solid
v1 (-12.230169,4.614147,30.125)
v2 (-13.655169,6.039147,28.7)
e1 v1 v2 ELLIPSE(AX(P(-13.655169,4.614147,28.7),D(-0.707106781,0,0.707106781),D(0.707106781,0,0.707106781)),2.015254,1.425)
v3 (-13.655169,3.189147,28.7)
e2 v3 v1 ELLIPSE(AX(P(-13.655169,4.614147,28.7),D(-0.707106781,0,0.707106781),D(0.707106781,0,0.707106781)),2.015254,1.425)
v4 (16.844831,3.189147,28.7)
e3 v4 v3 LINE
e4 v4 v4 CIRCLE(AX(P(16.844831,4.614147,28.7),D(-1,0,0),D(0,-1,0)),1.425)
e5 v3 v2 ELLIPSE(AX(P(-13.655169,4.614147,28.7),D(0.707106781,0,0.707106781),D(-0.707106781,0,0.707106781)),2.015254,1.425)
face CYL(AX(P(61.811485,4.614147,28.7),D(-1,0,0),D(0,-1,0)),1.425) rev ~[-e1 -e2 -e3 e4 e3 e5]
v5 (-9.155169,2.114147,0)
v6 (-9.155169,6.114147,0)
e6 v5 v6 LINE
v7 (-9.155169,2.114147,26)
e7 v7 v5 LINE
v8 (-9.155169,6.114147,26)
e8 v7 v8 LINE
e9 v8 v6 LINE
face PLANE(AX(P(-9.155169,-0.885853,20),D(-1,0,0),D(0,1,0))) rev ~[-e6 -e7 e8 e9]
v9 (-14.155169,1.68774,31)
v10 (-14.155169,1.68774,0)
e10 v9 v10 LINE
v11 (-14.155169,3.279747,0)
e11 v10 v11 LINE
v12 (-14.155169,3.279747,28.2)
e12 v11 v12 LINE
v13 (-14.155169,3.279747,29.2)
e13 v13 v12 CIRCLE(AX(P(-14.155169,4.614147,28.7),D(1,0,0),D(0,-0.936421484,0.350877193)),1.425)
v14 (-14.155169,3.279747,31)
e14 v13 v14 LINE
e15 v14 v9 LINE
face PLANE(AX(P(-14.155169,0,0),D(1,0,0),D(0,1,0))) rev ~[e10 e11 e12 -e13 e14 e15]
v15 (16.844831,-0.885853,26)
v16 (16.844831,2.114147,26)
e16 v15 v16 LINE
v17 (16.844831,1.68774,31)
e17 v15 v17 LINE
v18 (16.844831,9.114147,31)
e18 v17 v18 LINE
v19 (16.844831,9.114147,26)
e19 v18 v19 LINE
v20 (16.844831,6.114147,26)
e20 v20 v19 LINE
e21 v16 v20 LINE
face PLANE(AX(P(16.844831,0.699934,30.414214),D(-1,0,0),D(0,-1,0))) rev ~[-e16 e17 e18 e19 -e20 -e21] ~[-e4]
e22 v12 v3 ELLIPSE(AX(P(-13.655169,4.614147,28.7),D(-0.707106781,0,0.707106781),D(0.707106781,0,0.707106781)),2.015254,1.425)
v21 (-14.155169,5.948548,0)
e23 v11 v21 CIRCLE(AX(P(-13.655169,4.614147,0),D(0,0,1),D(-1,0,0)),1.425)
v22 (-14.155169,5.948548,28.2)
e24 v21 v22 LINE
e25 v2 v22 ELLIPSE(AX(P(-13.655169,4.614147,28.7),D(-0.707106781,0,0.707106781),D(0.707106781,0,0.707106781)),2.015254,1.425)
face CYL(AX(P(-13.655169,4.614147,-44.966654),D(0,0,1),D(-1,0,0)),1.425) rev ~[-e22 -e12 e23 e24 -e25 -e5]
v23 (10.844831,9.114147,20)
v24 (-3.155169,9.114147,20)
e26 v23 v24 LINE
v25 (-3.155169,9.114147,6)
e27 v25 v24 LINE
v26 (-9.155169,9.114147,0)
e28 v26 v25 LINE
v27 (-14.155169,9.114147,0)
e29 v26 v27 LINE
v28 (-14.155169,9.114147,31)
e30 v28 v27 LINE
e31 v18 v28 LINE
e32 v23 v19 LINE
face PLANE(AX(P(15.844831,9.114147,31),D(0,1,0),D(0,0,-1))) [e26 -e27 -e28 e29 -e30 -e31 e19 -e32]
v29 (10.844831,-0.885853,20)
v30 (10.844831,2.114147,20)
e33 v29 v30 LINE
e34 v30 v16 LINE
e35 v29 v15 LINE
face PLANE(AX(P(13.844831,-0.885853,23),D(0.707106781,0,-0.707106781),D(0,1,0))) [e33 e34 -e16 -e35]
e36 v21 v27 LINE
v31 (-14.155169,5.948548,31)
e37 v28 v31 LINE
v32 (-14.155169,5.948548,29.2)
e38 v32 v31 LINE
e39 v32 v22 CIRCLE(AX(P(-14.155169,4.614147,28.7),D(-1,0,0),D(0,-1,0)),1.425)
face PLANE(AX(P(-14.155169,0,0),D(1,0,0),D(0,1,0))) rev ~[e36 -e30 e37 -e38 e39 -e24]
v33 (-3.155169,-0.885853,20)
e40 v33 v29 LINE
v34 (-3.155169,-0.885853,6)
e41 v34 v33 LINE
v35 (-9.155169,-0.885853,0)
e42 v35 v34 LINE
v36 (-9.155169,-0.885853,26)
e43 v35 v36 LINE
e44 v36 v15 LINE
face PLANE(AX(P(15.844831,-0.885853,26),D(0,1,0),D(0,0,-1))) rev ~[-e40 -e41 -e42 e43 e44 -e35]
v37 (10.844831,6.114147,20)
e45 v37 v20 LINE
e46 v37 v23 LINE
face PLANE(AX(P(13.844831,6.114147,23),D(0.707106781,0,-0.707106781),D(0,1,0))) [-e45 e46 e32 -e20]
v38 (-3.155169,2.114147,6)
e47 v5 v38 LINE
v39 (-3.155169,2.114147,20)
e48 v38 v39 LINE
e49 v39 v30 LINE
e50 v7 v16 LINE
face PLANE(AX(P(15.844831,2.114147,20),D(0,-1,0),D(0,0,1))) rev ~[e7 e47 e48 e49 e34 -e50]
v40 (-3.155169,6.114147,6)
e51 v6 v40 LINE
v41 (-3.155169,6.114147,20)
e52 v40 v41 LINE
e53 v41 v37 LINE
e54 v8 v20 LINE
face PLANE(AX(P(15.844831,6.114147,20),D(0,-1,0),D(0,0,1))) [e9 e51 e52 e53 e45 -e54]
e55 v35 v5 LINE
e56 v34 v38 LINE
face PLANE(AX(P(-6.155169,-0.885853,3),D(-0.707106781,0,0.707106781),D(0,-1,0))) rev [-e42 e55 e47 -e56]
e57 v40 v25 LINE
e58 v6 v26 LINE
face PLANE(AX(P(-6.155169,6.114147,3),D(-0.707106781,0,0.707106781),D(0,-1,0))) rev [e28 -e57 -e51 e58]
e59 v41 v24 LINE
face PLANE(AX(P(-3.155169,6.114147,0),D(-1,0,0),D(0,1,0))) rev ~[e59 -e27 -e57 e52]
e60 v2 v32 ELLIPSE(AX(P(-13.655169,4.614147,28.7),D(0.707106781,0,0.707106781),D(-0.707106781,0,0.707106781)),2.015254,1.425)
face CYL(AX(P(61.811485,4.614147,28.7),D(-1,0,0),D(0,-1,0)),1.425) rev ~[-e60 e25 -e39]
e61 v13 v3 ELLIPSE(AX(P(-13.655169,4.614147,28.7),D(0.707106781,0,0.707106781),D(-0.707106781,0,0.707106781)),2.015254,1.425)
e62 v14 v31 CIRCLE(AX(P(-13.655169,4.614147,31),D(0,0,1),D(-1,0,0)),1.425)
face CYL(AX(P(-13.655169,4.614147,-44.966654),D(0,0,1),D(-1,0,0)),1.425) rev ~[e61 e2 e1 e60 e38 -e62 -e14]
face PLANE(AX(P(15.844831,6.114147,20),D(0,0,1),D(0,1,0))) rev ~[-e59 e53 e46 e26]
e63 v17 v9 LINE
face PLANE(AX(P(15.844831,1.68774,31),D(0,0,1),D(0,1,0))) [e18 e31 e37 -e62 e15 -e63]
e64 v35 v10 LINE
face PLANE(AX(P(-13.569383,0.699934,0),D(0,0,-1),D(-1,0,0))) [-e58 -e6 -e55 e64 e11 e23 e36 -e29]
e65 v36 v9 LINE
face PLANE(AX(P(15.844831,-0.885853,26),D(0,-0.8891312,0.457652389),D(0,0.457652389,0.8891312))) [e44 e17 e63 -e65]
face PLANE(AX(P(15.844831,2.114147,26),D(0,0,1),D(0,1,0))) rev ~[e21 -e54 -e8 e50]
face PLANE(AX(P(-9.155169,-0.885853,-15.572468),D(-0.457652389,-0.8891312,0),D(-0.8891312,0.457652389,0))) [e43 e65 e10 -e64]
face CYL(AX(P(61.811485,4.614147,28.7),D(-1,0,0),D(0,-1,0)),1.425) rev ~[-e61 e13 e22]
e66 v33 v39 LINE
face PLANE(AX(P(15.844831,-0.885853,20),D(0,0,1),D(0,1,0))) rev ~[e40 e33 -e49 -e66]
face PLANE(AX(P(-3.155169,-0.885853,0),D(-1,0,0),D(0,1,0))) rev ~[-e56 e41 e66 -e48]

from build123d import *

# Parameters (mm, degrees)
F1_DEPTH      = 20
F2_W          = 7
F2_H          = 20
F3_DEPTH      = 2
F5_DEPTH      = 6
F6_W          = 3
F6_H          = 6
F7_DEPTH      = 25
F8_DEPTH      = 3
F12_DEPTH     = 2
F13_DEPTH     = 11
F14_T4_DEPTH  = 29
F14_T10_DEPTH = 28
F14_T17_DEPTH = 38.2867319519
F14_T24_DEPTH = 39.2867319519
F15_T1_DEPTH  = 61.1449358039
F15_T3_DEPTH  = 60.1449358039
F16_DEPTH     = 1
F17_SIZE      = 6
F20_D         = 2.85
F20_ON_F18_D  = 2.85


# Not quite as in the source:
# - a fillet or chamfer that OpenCascade refuses, or shapes differently, is made with other operations: its cross-section is extruded or revolved along the edge and cut away or added


with BuildPart() as f1:
    # F0 (on Top) → F1 (new body)
    with BuildSketch(Plane.XY):
        Polygon((-3.1551690071, 9.1141472052), (-12.1551690071, 9.1141472052), (-12.1551690071, -0.8858527948), (-3.1551690071, -0.8858527948), (-3.1551690071, 2.1141472052), (-9.1551690071, 2.1141472052), (-9.1551690071, 6.1141472052), (-3.1551690071, 6.1141472052), align=None)
    extrude(amount=F1_DEPTH)

    # F2 (on face) → F3 (join)
    with BuildSketch(Plane(origin=(-12.1551690071, 0, 0), x_dir=(0, -1, 0), z_dir=(-1, 0, 0))):
        with Locations((-5.6141472052, 10)):
            Rectangle(F2_W, F2_H)
    extrude(amount=F3_DEPTH)

    # F4 (on face) → F5 (join)
    with BuildSketch(Plane.XY.offset(20)):
        Polygon((-12.1345976368, 9.1141472052), (-12.1551690071, 2.1141472052), (-12.1551690071, -0.8858527948), (-9.1551690071, -0.8858527948), (-9.1551690071, 2.1141472052), (-9.1551690071, 6.1141472052), (-9.1551690071, 9.1141472052), align=None)
    extrude(amount=F5_DEPTH)

    # F6 (on face) → F7 (join)
    with BuildSketch(Plane.YZ.offset(-9.1551690071)):
        with Locations((7.6141472052, 23)):
            Rectangle(F6_W, F6_H)
        with Locations((0.6141472052, 23)):
            Rectangle(F6_W, F6_H)
        Polygon((-0.8858527948, 26), (2.1141472052, 26), (6.1141472052, 26), (9.1141472052, 26), (9.1141472052, 29), (-0.8858527948, 29), align=None)
    extrude(amount=F7_DEPTH)

    # F8 (add): a face of the model
    f8_faces = [f1.faces().sort_by_distance(p)[0] for p in [
        (-10.6515768532, 4.1077318265, 26),
    ]]
    extrude(f8_faces, amount=F8_DEPTH)

    # F9: union 

    # F10: union 

    # F11 (on face) → F12 (join)
    with BuildSketch(Plane.XY.offset(29)):
        Polygon((-12.1345976368, 9.1141472052), (-12.1551690071, 2.1141472052), (15.8448309929, 2.1141472052), (15.8448309929, 9.1141472052), align=None)
    extrude(amount=F12_DEPTH)

    # F4 (on face) → F13 (join)
    with BuildSketch(Plane.XY.offset(20)):
        Polygon((-14.1551690071, 2.1141472052), (-12.1551690071, 2.1141472052), (-12.1345976368, 9.1141472052), (-14.1551690071, 9.1141472052), align=None)
    extrude(amount=F13_DEPTH)

    # F14: chamfer of 4 on 2 edges, made by hand


with BuildPart() as f14_tool2:
    # F14_s3 → F14_t4 (new body)
    with BuildSketch(Plane.XY):
        Polygon((-12.1551690071, -1.8858527948), (-16.1551690071, 2.1141472052), (-12.1551690071, 2.1141472052), align=None)
    extrude(amount=F14_T4_DEPTH)

    split(bisect_by=Plane.XZ.offset(0.8858527948), keep=Keep.BOTTOM)

    split(bisect_by=Plane.YZ.offset(-14.1551690071), keep=Keep.TOP)


with BuildPart() as f1_1:
    add(f1.part)

    # F14_t1: union F14_tool2
    add(f14_tool2.part)


with BuildPart() as f14_tool8:
    # F14_s9 → F14_t10 (new body)
    with BuildSketch(Plane.YZ.offset(-12.1551690071)):
        Polygon((-1.8858527948, 29), (2.1141472052, 33), (2.1141472052, 29), align=None)
    extrude(amount=F14_T10_DEPTH)

    split(bisect_by=Plane.XZ.offset(0.8858527948), keep=Keep.BOTTOM)

    split(bisect_by=Plane.XY.offset(31), keep=Keep.BOTTOM)


with BuildPart() as f1_2:
    add(f1_1.part)

    # F14_t7: union F14_tool8
    add(f14_tool8.part)


with BuildPart() as f14_tool15:
    # F14_s16 → F14_t17 (new body)
    with BuildSketch(Plane.YZ.offset(-22.4419009589)):
        Polygon((-1.8858527948, 29), (2.1141472052, 33), (2.1141472052, 29), align=None)
    extrude(amount=F14_T17_DEPTH)

    split(bisect_by=Plane.XZ.offset(0.8858527948), keep=Keep.BOTTOM)

    split(bisect_by=Plane.YZ.offset(-12.1551690071), keep=Keep.BOTTOM)

    split(bisect_by=Plane.YZ.offset(-14.1551690071), keep=Keep.TOP)

    split(bisect_by=Plane.XY.offset(31), keep=Keep.BOTTOM)


with BuildPart() as f14_tool22:
    # F14_s23 → F14_t24 (new body)
    with BuildSketch(Plane.XY):
        Polygon((-12.1551690071, -1.8858527948), (-16.1551690071, 2.1141472052), (-12.1551690071, 2.1141472052), align=None)
    extrude(amount=F14_T24_DEPTH)

    split(bisect_by=Plane.XZ.offset(0.8858527948), keep=Keep.BOTTOM)

    split(bisect_by=Plane.XY.offset(29), keep=Keep.TOP)

    split(bisect_by=Plane.YZ.offset(-14.1551690071), keep=Keep.TOP)

    split(bisect_by=Plane.XY.offset(31), keep=Keep.BOTTOM)


with BuildPart() as f14_tool15_1:
    add(f14_tool15.part)

    # F14_t29: intersect F14_tool22
    add(f14_tool22.part, mode=Mode.INTERSECT)


with BuildPart() as f1_3:
    add(f1_2.part)

    # F14_t13: union F14_tool15
    add(f14_tool15_1.part)

    # F15: chamfer of 4 x 6 on 2 edges, made by hand

    # F15_s2 → F15_t1 (cut)
    with BuildSketch(Plane.XY.offset(-15.5724679019)):
        Polygon((-9.1551690071, -0.8858527948), (-17.3978096942, 3.3567878923), (-13.1551690071, -0.8858527948), align=None)
    extrude(amount=F15_T1_DEPTH, mode=Mode.SUBTRACT)

    # F15_s4 → F15_t3 (cut)
    with BuildSketch(Plane.YZ.offset(-28.7276369091)):
        Polygon((-0.8858527948, 26), (3.3567878923, 34.2426406871), (-0.8858527948, 30), align=None)
    extrude(amount=F15_T3_DEPTH, mode=Mode.SUBTRACT)

    # F16 (add): a face of the model
    f16_faces = [f1_3.faces().sort_by_distance(p)[0] for p in [
        (15.8448309929, 6.2628078927, 23),
    ]]
    extrude(f16_faces, amount=F16_DEPTH)

    # F17
    f17_edges = [f1_3.edges().sort_by_distance(p)[0] for p in [
        (-3.155169, 0.614147, 0),
        (-3.155169, 7.614147, 0),
        (16.844831, 0.614147, 20),
        (16.844831, 7.614147, 20),
    ]]
    chamfer(f17_edges, length=F17_SIZE)

    # F20 (through all)
    with Locations(Plane(origin=(0, 0, 0), x_dir=(1, 0, 0), z_dir=(0, 0, -1))):
        with Locations((-13.6551690071, -4.6141472052)):
            Hole(F20_D / 2)

    # F20 on F18 (through all)
    with Locations(Plane.YZ.offset(16.8448309929)):
        with Locations((4.6141472052, 28.7)):
            Hole(F20_ON_F18_D / 2)


solid = f1_3.part
